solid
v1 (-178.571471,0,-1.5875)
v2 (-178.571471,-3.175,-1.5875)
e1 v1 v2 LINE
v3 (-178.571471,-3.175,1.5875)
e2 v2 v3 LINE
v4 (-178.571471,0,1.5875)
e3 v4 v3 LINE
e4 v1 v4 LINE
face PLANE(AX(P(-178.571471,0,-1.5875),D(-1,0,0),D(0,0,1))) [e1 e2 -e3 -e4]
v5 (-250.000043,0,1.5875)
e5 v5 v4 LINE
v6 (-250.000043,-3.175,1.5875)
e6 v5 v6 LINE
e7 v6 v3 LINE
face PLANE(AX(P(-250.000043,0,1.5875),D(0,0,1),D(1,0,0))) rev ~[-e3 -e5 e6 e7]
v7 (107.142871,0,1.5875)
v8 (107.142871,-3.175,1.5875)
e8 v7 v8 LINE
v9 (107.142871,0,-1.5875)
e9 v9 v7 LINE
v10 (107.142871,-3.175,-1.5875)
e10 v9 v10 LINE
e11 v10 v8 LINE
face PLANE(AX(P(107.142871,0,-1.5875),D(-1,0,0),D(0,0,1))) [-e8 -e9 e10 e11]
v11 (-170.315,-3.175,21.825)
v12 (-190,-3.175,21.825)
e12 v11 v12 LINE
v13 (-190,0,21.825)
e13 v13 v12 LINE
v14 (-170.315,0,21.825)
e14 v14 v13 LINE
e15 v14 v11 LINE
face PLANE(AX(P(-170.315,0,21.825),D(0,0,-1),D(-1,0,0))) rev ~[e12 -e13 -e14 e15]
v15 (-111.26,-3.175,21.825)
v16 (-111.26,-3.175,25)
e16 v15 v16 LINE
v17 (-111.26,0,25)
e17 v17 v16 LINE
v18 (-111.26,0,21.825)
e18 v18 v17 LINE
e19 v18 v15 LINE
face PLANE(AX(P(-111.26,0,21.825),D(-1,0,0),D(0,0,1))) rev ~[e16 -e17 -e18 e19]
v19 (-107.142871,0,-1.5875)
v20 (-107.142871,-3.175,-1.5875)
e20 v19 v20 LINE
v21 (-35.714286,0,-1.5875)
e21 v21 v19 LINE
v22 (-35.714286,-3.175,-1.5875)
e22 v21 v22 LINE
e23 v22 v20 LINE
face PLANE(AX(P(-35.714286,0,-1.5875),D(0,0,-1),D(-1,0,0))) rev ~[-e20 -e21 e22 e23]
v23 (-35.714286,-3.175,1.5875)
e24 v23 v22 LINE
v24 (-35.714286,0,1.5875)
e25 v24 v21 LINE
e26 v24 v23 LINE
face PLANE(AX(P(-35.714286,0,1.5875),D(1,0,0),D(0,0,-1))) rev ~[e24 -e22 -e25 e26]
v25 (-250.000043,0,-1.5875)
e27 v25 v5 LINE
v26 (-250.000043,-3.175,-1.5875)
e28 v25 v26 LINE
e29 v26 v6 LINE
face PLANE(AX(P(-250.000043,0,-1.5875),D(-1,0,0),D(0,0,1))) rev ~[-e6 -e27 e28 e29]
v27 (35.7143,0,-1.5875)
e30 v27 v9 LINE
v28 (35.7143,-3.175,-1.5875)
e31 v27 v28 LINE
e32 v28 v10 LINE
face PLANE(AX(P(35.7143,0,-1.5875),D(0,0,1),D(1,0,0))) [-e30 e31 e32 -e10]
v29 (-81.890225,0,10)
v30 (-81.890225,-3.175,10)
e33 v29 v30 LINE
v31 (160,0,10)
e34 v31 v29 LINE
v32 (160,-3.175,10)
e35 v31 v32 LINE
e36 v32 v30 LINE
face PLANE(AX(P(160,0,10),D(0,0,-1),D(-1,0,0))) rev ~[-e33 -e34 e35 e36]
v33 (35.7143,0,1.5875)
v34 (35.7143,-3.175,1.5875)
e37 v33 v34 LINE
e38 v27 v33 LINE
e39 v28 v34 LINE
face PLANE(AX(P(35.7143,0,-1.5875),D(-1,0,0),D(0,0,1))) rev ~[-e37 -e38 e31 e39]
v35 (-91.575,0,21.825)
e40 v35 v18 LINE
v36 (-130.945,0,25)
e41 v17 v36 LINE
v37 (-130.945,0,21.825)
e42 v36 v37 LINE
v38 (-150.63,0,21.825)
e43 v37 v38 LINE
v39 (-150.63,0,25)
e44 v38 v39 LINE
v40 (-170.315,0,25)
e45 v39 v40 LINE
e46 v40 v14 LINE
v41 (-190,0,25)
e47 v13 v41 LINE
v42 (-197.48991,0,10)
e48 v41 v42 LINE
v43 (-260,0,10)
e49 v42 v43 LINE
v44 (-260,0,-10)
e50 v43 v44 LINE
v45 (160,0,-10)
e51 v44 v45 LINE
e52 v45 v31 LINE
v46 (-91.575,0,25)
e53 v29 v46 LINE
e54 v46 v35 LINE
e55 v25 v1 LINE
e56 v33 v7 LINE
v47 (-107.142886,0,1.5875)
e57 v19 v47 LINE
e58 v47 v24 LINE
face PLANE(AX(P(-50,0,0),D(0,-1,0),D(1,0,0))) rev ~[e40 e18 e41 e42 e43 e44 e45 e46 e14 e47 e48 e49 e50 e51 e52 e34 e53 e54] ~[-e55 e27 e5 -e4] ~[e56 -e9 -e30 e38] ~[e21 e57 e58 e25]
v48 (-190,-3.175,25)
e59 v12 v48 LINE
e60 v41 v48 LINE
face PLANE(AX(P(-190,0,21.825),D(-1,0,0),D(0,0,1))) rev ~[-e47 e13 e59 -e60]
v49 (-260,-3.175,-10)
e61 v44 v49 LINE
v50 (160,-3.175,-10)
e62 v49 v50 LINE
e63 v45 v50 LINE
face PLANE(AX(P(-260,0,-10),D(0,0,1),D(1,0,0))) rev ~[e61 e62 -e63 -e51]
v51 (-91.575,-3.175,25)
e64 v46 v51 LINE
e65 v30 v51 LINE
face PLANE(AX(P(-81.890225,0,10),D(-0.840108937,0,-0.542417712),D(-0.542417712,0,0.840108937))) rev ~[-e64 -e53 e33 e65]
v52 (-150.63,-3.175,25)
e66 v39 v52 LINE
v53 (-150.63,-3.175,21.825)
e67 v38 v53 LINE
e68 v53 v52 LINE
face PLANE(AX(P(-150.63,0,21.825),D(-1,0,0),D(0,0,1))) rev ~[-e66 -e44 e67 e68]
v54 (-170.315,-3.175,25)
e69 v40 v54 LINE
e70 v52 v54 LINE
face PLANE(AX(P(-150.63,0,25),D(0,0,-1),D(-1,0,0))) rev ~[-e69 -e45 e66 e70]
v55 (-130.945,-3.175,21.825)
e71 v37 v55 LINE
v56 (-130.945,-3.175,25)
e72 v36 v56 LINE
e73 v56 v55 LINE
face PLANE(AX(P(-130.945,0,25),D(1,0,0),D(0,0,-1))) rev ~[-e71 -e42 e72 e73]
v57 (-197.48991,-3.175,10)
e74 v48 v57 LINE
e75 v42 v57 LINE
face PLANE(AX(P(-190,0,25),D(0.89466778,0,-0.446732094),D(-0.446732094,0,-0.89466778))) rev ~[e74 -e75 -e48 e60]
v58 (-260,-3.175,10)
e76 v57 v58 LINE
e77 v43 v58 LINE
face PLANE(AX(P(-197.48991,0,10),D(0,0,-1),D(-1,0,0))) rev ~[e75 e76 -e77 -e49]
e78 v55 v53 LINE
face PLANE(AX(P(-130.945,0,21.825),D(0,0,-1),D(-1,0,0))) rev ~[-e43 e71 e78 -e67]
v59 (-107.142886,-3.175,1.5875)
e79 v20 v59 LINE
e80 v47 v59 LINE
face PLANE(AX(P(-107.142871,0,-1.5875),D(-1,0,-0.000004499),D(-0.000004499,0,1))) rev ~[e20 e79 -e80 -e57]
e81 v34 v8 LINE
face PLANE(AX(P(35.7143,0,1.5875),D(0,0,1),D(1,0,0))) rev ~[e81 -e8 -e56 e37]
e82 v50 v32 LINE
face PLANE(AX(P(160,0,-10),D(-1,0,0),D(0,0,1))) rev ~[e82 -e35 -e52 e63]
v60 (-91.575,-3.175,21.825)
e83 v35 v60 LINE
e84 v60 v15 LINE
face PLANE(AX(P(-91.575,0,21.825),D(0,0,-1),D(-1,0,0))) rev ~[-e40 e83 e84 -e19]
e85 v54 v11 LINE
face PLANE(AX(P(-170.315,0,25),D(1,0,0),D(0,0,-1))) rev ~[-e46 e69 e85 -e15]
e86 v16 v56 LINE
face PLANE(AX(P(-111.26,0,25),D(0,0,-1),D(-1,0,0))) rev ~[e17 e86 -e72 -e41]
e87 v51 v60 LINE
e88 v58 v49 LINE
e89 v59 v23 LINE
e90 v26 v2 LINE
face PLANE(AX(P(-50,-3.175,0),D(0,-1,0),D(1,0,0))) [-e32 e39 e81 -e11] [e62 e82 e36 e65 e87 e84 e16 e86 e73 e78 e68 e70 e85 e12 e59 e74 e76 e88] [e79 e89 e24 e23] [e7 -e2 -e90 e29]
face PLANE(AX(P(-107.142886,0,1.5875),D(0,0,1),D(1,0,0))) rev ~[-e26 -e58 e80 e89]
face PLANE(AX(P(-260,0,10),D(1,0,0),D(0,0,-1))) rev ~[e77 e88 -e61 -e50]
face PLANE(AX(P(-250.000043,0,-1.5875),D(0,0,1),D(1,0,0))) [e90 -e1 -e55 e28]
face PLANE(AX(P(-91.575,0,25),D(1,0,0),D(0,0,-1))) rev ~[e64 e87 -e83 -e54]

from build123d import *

# Parameters (mm, degrees)
F0_W     = 71.4285714286
F0_H     = 3.175
F1_DEPTH = 3.175


# Not quite as in the source:
# - ends of sketch curves that miss each other by under 0.0002 mm in the source are joined


with BuildPart() as f1:
    # F0 (on Front) → F1 (new body)
    with BuildSketch(Plane.XZ):
        Polygon((-260, 10), (-260, -10), (160, -10), (160, 10), (-81.8902254105, 10), (-91.575, 10), (-190, 10), (-197.4899102798, 10), align=None)
        with Locations((-214.2857571429, 0)):
            Rectangle(F0_W, F0_H, mode=Mode.SUBTRACT)
        Polygon((-35.7142857143, 1.5875), (-35.7142857143, -1.5875), (-107.1428714286, -1.5875), (-107.1428857143, 1.5875), align=None, mode=Mode.SUBTRACT)
        with Locations((71.4285857143, 0)):
            Rectangle(F0_W, F0_H, mode=Mode.SUBTRACT)
        Polygon((-190, 25), (-197.4899102798, 10), (-190, 10), (-190, 21.825), align=None)
        Polygon((-190, 21.825), (-190, 10), (-91.575, 10), (-91.575, 21.825), (-111.26, 21.825), (-111.26, 25), (-130.945, 25), (-130.945, 21.825), (-150.63, 21.825), (-150.63, 25), (-170.315, 25), (-170.315, 21.825), align=None)
        Polygon((-91.575, 10), (-81.8902254105, 10), (-91.575, 25), (-91.575, 21.825), align=None)
    extrude(amount=F1_DEPTH)


solid = f1.part
